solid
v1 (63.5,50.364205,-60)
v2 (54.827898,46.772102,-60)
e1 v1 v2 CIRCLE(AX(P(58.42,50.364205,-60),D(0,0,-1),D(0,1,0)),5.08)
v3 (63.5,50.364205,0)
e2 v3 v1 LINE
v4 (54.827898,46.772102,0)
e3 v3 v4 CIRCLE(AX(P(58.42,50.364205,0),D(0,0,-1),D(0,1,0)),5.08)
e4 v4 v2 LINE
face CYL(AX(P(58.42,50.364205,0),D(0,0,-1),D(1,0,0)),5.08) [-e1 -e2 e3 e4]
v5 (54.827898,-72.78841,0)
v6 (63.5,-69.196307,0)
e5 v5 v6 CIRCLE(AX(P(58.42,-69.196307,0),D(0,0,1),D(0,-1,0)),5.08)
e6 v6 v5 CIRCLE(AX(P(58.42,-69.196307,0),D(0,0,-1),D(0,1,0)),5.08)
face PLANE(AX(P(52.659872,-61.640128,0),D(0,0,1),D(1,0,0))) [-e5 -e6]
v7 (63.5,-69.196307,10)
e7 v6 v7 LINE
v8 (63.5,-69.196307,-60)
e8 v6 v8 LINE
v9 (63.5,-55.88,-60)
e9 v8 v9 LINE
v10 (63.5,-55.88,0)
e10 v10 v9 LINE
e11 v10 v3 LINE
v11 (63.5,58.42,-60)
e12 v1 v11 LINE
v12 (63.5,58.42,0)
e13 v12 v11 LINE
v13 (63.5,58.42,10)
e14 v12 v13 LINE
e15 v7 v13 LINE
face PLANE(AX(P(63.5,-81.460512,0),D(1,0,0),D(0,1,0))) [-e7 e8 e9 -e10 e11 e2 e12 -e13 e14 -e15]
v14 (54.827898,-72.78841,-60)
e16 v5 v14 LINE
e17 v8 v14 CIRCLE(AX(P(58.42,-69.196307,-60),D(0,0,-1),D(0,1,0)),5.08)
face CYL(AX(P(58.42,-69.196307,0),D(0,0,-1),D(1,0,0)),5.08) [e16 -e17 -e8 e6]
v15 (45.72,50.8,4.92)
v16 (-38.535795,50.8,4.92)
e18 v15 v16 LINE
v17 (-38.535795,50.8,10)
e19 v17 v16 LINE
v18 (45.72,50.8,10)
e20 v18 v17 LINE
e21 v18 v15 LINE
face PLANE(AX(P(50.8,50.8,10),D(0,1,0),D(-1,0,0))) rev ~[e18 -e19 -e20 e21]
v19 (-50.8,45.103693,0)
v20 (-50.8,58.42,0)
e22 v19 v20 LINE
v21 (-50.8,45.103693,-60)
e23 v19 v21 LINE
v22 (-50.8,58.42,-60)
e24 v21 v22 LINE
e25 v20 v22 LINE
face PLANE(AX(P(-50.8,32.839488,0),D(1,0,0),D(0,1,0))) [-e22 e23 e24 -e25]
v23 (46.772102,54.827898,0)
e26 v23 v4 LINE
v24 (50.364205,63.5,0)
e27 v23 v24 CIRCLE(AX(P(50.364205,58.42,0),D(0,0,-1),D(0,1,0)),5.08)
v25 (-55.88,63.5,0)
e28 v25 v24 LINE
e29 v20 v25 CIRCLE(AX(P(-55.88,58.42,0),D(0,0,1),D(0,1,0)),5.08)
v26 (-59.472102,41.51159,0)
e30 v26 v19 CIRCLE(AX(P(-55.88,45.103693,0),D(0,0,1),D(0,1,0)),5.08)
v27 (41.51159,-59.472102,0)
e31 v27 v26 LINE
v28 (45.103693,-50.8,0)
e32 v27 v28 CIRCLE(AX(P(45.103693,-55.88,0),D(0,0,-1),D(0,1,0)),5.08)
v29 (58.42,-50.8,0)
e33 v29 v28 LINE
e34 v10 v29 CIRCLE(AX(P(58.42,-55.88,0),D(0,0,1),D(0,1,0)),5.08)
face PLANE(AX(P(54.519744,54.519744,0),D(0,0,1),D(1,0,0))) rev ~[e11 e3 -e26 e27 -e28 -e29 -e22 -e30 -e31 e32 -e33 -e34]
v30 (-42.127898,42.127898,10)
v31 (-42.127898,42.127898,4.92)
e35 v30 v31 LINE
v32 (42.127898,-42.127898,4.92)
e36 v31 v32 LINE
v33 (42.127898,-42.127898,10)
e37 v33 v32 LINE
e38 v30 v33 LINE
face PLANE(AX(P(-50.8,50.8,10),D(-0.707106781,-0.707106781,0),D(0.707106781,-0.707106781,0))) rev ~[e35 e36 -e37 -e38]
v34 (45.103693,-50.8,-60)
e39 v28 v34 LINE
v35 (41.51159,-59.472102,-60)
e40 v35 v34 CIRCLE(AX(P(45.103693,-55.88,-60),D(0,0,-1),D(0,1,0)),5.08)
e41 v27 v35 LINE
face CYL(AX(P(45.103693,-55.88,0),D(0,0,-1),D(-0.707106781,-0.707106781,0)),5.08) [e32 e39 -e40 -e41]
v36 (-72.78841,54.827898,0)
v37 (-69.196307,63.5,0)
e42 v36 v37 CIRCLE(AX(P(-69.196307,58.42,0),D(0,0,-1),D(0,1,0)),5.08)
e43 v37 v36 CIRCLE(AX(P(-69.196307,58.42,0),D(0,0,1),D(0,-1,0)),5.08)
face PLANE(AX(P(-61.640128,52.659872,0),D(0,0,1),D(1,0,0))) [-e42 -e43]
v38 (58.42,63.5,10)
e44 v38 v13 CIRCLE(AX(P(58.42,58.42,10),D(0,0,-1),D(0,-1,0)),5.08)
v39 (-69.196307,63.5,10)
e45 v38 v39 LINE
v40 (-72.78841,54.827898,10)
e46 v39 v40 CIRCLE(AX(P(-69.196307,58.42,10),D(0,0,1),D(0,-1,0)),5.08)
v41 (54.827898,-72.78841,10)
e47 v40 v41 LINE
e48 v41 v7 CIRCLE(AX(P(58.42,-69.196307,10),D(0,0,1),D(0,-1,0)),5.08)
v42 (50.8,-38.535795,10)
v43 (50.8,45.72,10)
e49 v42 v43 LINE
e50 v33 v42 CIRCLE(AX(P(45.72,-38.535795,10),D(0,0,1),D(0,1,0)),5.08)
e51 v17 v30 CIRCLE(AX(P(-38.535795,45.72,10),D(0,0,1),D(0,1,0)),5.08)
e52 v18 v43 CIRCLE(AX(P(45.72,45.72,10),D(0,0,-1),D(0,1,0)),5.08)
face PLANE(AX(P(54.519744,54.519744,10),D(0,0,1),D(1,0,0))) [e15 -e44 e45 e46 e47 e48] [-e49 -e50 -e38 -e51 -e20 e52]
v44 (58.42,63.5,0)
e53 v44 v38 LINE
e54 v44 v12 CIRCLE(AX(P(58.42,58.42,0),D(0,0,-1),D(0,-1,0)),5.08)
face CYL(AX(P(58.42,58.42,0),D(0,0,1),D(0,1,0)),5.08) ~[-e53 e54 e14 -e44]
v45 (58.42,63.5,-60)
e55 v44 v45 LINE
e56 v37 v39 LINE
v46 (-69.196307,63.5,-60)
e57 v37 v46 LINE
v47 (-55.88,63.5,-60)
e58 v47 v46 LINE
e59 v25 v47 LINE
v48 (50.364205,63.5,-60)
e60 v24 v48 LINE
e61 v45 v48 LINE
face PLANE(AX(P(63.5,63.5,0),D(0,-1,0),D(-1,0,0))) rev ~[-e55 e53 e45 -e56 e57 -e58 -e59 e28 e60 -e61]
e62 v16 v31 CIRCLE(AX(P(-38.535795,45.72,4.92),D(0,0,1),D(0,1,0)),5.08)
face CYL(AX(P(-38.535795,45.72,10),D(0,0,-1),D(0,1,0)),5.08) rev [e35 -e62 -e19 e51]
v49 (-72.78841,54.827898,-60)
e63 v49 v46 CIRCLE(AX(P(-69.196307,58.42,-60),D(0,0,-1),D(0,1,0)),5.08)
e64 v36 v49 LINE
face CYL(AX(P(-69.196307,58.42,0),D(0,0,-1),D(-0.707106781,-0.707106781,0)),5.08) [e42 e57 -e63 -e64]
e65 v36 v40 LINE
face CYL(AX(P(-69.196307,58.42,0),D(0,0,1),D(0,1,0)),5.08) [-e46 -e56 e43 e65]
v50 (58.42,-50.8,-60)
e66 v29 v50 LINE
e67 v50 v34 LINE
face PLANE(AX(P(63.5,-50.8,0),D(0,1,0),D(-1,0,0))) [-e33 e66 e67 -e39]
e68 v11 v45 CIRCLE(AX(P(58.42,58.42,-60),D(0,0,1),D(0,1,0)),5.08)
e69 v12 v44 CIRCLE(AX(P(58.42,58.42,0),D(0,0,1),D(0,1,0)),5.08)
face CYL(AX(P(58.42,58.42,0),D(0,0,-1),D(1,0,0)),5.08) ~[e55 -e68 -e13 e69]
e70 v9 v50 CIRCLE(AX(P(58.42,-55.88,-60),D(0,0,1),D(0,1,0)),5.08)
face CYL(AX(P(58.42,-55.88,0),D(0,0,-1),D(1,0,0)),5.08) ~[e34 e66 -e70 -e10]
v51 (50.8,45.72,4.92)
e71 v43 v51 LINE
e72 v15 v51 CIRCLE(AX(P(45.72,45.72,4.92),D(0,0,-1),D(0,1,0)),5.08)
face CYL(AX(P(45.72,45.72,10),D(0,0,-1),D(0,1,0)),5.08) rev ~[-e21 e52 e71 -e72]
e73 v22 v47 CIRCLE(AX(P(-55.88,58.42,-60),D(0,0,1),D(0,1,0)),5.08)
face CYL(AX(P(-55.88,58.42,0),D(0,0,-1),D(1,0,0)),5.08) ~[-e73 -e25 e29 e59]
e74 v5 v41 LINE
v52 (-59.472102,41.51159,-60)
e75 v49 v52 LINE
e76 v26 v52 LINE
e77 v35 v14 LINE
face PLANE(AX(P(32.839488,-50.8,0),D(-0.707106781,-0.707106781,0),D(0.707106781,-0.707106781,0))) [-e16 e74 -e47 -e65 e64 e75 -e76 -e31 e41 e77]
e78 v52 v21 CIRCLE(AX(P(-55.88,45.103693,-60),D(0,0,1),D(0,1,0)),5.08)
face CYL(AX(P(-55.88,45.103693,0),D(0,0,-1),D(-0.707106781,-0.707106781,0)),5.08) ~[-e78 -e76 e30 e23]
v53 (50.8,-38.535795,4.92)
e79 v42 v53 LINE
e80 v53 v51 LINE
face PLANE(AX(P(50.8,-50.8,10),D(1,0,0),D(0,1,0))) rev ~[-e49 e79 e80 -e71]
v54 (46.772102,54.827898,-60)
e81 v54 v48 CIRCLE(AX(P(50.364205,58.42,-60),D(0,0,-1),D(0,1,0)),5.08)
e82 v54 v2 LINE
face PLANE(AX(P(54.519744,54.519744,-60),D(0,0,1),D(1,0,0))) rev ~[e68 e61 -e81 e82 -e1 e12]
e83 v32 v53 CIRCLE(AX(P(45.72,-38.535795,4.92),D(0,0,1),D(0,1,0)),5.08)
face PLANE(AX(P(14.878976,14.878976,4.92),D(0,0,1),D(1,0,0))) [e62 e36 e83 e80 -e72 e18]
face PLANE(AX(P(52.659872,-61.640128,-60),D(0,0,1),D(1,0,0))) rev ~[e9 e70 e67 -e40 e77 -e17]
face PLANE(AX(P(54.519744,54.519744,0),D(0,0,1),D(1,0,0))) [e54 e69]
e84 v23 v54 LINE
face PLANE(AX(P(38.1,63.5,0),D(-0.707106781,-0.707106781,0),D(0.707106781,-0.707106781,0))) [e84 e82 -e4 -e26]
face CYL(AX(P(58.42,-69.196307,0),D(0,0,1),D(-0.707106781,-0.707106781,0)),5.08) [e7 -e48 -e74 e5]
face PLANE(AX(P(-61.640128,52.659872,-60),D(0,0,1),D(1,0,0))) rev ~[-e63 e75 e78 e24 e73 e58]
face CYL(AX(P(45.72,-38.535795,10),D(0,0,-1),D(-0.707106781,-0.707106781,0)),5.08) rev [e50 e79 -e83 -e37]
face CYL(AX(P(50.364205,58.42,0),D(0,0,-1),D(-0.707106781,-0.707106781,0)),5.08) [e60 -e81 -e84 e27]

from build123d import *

# Parameters (mm, degrees)
F1_DEPTH = 10
F2_R     = 5.08
F4_DEPTH = 60
F5_R     = 5.08
F7_DEPTH = 5.08
F8_R     = 5.08


# Not quite as in the source:
# - a feature names something its author has since deleted; it is built from what else it names


with BuildPart() as f1:
    # F0 (on Top) → F1 (new body)
    with BuildSketch(Plane.XY):
        Polygon((63.5, 38.1), (63.5, 63.5), (38.1, 63.5), (50.8, 50.8), align=None)
        Polygon((50.8, 50.8), (38.1, 63.5), (-50.8, 63.5), (-50.8, 32.8394877579), (32.8394877579, -50.8), (63.5, -50.8), (63.5, 38.1), align=None)
        Polygon((-50.8, 32.8394877579), (-50.8, 63.5), (-81.4605122421, 63.5), align=None)
        Polygon((63.5, -81.4605122421), (63.5, -50.8), (32.8394877579, -50.8), align=None)
    extrude(amount=F1_DEPTH)

    # F2
    f2_edges = [f1.edges().sort_by_distance(p)[0] for p in [
        (63.5, -81.460512, 5),
        (-81.460512, 63.5, 5),
        (63.5, 63.5, 5),
    ]]
    fillet(f2_edges, radius=F2_R)

    # F0 (on Top) + F3 (on face) → F4 (join)
    with BuildSketch(Plane.XY):
        Polygon((63.5, -81.4605122421), (63.5, -50.8), (32.8394877579, -50.8), align=None)
        Polygon((63.5, 38.1), (63.5, 63.5), (38.1, 63.5), (50.8, 50.8), align=None)
    with BuildSketch(Plane.XY):
        Polygon((-50.8, 63.5), (-81.4605122421, 63.5), (-50.8, 32.8394877579), align=None)
    extrude(amount=-F4_DEPTH)

    # F5
    f5_edges = [f1.edges().sort_by_distance(p)[0] for p in [
        (-81.460512, 63.5, -30),
        (63.5, -81.460512, -30),
        (63.5, 63.5, -30),
        (32.839488, -50.8, -30),
        (-50.8, 32.839488, -30),
        (-50.8, 63.5, -30),
        (38.1, 63.5, -30),
        (63.5, 38.1, -30),
        (63.5, -50.8, -30),
    ]]
    fillet(f5_edges, radius=F5_R)

    # F6 (on face) → F7 (cut)
    with BuildSketch(Plane.XY.offset(10)):
        Polygon((50.8, 50.8), (-50.8, 50.8), (50.8, -50.8), align=None)
    extrude(amount=-F7_DEPTH, mode=Mode.SUBTRACT)

    # F8
    f8_edges = [f1.edges().sort_by_distance(p)[0] for p in [
        (50.8, 50.8, 7.46),
        (-50.8, 50.8, 7.46),
        (50.8, -50.8, 7.46),
    ]]
    fillet(f8_edges, radius=F8_R)


solid = f1.part
